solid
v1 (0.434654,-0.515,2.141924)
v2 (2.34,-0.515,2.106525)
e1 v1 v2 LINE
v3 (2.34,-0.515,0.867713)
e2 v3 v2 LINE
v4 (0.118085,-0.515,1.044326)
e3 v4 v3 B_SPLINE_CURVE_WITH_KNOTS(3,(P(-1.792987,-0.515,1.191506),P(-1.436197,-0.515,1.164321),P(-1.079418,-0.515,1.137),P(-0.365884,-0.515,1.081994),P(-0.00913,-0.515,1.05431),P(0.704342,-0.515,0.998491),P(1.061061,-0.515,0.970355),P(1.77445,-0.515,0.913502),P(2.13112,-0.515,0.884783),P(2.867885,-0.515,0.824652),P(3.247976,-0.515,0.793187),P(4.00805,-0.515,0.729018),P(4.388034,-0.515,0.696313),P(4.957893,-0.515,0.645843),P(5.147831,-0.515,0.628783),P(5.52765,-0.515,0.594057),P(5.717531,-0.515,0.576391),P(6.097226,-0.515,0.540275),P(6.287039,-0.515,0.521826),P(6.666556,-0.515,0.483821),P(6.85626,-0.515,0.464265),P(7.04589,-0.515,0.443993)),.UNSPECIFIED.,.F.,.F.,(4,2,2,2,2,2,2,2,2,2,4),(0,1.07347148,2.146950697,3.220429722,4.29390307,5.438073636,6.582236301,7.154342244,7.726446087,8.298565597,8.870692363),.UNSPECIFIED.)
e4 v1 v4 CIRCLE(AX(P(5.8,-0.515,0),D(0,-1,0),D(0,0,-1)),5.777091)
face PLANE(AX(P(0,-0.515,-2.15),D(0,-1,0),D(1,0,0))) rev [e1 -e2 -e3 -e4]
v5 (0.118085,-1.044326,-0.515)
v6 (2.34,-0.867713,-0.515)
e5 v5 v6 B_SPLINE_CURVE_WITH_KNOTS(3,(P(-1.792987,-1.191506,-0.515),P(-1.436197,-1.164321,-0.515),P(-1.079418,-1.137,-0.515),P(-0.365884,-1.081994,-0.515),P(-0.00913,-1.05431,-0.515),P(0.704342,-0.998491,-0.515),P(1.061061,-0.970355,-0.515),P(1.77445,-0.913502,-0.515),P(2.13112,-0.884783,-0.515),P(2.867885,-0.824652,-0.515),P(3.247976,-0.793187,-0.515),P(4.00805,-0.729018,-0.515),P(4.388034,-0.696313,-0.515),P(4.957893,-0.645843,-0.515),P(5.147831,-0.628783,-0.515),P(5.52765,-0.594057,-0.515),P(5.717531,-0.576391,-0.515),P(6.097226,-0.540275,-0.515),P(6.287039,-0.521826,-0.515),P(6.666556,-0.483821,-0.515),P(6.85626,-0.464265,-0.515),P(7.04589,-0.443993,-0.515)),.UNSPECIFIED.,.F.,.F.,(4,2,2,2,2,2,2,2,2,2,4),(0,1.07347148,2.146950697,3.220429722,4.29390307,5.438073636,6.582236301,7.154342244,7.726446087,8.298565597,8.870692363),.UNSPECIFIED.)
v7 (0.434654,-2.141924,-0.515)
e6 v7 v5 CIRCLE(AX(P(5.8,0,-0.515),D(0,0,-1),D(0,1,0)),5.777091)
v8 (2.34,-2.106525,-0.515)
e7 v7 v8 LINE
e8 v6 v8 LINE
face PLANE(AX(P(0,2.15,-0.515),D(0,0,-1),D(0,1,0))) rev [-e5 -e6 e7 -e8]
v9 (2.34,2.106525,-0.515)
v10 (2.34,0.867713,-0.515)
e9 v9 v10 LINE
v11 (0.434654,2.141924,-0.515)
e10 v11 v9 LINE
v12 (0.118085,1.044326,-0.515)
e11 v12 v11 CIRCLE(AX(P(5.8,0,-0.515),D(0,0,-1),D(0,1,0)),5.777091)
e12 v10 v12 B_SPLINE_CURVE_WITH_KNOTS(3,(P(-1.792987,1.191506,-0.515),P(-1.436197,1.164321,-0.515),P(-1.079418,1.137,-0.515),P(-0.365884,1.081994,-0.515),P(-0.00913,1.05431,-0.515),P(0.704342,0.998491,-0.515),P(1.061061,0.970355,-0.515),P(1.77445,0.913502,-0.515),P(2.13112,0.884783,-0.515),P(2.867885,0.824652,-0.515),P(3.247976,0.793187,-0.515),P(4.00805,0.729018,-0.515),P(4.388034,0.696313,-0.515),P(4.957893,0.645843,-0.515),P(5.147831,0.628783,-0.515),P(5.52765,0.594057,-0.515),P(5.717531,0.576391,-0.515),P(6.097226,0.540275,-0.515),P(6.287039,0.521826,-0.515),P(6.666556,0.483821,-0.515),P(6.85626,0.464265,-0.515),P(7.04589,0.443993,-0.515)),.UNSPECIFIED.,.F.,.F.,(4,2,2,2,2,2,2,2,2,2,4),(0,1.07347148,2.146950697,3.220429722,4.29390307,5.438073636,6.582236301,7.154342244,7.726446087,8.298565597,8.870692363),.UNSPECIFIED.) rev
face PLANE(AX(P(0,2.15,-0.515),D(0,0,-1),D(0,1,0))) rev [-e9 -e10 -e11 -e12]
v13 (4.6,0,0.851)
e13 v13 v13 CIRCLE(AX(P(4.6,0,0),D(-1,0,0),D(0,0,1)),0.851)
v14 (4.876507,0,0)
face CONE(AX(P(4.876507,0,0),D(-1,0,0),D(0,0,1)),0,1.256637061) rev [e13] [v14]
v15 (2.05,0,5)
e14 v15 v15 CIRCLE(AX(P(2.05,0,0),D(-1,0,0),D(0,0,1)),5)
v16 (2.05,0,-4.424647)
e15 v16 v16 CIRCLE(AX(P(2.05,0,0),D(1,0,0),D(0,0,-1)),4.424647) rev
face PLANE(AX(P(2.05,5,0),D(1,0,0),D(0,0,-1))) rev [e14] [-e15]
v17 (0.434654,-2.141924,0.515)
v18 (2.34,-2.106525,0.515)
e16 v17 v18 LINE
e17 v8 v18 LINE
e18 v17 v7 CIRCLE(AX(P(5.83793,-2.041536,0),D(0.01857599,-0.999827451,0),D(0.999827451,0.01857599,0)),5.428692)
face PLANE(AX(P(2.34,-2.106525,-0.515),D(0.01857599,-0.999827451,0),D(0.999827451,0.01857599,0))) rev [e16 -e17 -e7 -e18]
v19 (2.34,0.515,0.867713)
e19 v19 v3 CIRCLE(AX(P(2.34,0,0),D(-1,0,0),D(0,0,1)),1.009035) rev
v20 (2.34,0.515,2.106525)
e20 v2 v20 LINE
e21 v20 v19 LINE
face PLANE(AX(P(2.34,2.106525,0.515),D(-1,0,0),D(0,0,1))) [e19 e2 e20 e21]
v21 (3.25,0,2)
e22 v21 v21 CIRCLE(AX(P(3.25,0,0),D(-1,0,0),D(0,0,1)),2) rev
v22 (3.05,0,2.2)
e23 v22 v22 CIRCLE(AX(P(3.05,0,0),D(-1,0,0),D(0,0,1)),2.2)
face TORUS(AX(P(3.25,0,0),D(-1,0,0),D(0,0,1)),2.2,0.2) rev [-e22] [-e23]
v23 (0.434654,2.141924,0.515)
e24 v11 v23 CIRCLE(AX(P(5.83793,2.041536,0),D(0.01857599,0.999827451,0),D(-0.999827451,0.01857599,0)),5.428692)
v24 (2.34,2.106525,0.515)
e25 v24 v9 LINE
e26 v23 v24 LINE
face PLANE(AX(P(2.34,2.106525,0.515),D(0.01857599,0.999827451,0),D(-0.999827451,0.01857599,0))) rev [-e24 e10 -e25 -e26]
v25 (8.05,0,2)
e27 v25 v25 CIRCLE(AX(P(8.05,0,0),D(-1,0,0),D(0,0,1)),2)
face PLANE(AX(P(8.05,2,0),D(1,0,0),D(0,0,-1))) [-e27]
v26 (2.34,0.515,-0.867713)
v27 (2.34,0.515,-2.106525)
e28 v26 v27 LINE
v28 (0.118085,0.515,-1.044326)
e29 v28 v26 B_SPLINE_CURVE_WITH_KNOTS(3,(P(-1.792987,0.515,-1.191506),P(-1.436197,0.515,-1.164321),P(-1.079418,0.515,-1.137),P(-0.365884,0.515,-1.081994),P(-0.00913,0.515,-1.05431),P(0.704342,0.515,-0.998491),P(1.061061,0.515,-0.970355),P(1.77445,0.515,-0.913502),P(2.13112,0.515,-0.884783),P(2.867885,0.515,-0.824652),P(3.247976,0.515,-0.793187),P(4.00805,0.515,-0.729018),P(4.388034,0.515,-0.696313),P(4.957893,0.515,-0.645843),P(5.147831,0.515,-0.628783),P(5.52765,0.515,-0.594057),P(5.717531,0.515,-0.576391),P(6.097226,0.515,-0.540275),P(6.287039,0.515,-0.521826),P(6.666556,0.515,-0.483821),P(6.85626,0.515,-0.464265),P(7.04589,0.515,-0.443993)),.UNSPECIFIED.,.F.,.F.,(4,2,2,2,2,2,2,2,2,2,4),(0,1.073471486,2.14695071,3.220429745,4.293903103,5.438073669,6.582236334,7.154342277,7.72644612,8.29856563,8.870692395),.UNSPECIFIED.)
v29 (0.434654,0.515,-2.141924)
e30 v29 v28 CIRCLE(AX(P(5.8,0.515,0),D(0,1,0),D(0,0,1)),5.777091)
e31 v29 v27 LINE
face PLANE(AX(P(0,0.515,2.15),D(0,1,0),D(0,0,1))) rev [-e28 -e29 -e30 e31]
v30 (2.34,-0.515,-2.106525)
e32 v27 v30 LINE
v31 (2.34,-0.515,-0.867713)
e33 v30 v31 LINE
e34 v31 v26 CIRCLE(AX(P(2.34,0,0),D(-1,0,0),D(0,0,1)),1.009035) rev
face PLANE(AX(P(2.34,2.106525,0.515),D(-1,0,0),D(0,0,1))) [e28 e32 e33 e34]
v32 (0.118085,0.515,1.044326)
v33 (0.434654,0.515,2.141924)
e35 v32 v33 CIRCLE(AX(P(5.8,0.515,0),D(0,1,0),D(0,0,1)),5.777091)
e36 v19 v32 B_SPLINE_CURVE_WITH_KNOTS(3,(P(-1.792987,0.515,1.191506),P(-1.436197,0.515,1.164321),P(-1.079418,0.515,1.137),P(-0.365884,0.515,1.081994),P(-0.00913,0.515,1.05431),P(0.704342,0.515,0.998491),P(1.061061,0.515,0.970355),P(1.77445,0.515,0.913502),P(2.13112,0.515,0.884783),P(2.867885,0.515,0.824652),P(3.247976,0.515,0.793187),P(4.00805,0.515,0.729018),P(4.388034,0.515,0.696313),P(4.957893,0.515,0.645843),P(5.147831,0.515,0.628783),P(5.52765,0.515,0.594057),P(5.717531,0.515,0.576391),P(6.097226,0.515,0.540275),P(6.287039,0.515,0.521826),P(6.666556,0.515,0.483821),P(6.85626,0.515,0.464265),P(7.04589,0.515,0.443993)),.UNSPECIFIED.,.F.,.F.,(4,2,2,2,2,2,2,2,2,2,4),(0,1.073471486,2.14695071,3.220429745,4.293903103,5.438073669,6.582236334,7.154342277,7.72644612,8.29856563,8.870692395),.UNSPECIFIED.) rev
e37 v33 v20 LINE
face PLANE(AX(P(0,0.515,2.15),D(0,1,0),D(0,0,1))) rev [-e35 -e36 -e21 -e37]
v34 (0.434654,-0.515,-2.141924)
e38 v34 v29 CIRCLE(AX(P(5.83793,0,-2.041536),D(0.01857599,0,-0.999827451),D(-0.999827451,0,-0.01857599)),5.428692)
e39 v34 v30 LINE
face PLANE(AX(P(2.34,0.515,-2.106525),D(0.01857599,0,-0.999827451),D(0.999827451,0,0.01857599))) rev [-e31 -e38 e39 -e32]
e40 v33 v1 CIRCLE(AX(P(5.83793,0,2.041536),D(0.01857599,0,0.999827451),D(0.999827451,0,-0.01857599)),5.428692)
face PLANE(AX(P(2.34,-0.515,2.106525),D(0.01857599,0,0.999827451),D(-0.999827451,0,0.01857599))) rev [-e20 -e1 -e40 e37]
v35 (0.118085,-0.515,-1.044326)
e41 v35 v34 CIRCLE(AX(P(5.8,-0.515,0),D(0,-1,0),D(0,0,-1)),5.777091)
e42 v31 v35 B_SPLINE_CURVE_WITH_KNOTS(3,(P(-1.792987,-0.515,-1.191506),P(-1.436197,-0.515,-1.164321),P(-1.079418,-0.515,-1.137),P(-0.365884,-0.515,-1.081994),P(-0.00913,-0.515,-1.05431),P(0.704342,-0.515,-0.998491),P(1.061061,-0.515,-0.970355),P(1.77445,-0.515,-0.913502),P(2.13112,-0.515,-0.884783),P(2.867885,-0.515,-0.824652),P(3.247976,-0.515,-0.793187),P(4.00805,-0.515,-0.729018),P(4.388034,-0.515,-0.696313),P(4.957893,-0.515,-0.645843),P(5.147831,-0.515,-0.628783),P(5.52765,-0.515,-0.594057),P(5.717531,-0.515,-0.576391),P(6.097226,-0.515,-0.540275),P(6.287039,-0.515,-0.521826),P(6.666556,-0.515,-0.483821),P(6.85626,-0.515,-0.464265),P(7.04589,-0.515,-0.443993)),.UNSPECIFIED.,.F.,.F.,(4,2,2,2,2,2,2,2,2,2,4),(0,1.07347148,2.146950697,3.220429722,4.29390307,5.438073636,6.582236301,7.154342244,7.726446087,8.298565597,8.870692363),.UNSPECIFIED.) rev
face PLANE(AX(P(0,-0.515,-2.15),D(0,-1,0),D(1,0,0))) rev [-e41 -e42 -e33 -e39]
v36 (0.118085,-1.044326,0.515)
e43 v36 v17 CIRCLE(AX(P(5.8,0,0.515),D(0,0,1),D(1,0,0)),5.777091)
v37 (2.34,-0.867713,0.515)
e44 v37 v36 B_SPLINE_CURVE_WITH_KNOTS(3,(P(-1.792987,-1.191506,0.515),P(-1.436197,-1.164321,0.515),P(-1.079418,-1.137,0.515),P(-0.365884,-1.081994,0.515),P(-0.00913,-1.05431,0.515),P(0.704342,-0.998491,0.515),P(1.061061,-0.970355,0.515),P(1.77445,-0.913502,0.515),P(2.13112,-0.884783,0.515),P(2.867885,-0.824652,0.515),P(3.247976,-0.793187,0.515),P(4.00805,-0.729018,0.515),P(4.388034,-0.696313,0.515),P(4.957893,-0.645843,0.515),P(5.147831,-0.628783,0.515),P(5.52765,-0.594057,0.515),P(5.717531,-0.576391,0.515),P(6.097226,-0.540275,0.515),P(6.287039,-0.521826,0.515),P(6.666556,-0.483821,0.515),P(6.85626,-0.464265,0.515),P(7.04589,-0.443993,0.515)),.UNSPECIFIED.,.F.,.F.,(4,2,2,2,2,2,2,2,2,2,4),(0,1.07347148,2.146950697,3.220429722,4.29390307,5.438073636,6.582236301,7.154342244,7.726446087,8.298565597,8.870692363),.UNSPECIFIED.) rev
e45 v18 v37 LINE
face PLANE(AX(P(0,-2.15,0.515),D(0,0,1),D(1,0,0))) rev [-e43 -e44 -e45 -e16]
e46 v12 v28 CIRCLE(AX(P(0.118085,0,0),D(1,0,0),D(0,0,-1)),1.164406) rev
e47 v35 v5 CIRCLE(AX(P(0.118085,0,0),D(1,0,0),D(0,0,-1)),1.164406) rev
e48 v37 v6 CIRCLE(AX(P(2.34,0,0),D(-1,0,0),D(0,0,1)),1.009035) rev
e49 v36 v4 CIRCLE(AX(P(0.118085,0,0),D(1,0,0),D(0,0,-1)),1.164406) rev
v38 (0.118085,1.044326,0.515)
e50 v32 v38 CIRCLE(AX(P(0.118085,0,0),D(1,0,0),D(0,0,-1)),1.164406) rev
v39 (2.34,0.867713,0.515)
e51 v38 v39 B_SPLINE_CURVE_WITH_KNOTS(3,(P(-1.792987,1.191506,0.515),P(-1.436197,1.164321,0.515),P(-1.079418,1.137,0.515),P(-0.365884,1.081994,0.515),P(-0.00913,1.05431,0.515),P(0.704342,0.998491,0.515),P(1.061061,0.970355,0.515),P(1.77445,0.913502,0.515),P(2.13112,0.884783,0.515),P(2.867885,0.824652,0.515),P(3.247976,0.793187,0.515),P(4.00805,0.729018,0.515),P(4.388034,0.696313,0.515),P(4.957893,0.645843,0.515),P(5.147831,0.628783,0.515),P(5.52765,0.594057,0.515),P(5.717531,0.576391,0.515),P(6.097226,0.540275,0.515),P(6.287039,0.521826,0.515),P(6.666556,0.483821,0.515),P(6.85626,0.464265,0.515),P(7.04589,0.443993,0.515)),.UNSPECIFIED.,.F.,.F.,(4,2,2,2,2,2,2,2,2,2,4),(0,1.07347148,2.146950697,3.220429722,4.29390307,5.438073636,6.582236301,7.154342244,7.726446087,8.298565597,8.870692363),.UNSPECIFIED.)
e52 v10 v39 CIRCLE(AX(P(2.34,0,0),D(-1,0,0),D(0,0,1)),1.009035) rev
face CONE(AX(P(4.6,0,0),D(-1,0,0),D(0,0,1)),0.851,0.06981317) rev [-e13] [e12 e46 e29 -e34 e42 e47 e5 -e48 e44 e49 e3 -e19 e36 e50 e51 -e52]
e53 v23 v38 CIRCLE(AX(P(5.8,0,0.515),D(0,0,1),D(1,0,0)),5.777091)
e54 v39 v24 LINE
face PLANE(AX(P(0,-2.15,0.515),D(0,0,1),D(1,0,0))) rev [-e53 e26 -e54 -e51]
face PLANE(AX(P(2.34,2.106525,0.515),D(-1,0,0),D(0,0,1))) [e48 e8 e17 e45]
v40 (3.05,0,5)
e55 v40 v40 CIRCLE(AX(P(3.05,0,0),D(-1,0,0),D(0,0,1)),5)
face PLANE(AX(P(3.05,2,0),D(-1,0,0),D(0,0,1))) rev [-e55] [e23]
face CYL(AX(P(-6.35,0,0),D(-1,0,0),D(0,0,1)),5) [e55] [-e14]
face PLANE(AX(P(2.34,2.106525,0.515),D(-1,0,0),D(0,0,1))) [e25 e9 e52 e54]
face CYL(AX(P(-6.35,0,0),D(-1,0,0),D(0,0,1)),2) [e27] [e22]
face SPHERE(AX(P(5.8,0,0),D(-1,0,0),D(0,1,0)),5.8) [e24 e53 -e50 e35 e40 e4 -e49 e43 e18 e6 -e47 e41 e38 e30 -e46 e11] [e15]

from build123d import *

# Parameters (mm, degrees)
RECPAT_COUNT = 2
RECPAT_ANGLE = 90


with BuildPart() as part:
    # Fillet1: read off the stored shape, not the designer's step
    # Fillet1 outline → Fillet1 (revolve)
    with BuildSketch(Plane.YX):
        with BuildLine():
            Line((2, 3.25), (2, 8.05))
            Line((2, 8.05), (0, 8.05))
            Line((0, 8.05), (0, 2.05))
            Line((0, 2.05), (5, 2.05))
            Line((5, 2.05), (5, 3.05))
            Line((5, 3.05), (2.2, 3.05))
            ThreePointArc((2.2, 3.05), (2.058578644, 3.108578644), (2, 3.25))
        make_face()
    revolve(axis=Axis((0, 0, 0), (1, 0, 0)))

    # PanSke → Pan (revolve)
    with BuildSketch(Plane.XY, mode=Mode.PRIVATE) as pan_sk:
        with BuildLine():
            Line((2.05, 4.424646879), (2.05, 0))
            Line((2.05, 0), (0, 0))
            ThreePointArc((0, 0), (0.537396082, 2.438237068), (2.05, 4.424646879))
        make_face()
    revolve(pan_sk.sketch.rotate(Axis((0, 0, 0), (1, 0, 0)), 90), axis=Axis((0, 0, 0), (1, 0, 0)))

    # Sketch3 → Recess section 0
    with BuildSketch(Plane(origin=(0, 0, 0), x_dir=(0, 0, -1), z_dir=(1, 0, 0))):
        with BuildLine():
            Line((-0.515, 2.15), (0.515, 2.15))
            Line((0.515, 2.15), (0.515, -2.15))
            Line((0.515, -2.15), (-0.515, -2.15))
            Line((-0.515, -2.15), (-0.515, 2.15))
        make_face()
    # Sketch4 → Recess section 1
    with BuildSketch(Plane(origin=(2.34, 0, 0), x_dir=(0, 0, -1), z_dir=(1, 0, 0))):
        with BuildLine():
            Line((-0.515, 2.106524682), (0.515, 2.106524682))
            Line((0.515, 2.106524682), (0.515, -2.106524682))
            Line((0.515, -2.106524682), (-0.515, -2.106524682))
            Line((-0.515, -2.106524682), (-0.515, 2.106524682))
        make_face()
    recess = loft(mode=Mode.SUBTRACT)

    # RecPat: Recess ×2 about axis
    recpat_axis = Axis((0, 0, 0), (1, 0, 0))
    for i in range(1, RECPAT_COUNT):
        add(recess.rotate(recpat_axis, i * RECPAT_ANGLE / (RECPAT_COUNT - 1)), mode=Mode.SUBTRACT)

    # RecCorSke → RecessCore (revolve, cut)
    with BuildSketch(Plane.XY, mode=Mode.PRIVATE) as recesscore_sk:
        Polygon((0, 0), (0, 1.172663335), (4.6, 0.851), (4.876506661, 0), align=None)
    revolve(recesscore_sk.sketch.rotate(Axis((-3.175, 0, 0), (1, 0, 0)), 90), axis=Axis((-3.175, 0, 0), (1, 0, 0)), mode=Mode.SUBTRACT)


solid = part.part
